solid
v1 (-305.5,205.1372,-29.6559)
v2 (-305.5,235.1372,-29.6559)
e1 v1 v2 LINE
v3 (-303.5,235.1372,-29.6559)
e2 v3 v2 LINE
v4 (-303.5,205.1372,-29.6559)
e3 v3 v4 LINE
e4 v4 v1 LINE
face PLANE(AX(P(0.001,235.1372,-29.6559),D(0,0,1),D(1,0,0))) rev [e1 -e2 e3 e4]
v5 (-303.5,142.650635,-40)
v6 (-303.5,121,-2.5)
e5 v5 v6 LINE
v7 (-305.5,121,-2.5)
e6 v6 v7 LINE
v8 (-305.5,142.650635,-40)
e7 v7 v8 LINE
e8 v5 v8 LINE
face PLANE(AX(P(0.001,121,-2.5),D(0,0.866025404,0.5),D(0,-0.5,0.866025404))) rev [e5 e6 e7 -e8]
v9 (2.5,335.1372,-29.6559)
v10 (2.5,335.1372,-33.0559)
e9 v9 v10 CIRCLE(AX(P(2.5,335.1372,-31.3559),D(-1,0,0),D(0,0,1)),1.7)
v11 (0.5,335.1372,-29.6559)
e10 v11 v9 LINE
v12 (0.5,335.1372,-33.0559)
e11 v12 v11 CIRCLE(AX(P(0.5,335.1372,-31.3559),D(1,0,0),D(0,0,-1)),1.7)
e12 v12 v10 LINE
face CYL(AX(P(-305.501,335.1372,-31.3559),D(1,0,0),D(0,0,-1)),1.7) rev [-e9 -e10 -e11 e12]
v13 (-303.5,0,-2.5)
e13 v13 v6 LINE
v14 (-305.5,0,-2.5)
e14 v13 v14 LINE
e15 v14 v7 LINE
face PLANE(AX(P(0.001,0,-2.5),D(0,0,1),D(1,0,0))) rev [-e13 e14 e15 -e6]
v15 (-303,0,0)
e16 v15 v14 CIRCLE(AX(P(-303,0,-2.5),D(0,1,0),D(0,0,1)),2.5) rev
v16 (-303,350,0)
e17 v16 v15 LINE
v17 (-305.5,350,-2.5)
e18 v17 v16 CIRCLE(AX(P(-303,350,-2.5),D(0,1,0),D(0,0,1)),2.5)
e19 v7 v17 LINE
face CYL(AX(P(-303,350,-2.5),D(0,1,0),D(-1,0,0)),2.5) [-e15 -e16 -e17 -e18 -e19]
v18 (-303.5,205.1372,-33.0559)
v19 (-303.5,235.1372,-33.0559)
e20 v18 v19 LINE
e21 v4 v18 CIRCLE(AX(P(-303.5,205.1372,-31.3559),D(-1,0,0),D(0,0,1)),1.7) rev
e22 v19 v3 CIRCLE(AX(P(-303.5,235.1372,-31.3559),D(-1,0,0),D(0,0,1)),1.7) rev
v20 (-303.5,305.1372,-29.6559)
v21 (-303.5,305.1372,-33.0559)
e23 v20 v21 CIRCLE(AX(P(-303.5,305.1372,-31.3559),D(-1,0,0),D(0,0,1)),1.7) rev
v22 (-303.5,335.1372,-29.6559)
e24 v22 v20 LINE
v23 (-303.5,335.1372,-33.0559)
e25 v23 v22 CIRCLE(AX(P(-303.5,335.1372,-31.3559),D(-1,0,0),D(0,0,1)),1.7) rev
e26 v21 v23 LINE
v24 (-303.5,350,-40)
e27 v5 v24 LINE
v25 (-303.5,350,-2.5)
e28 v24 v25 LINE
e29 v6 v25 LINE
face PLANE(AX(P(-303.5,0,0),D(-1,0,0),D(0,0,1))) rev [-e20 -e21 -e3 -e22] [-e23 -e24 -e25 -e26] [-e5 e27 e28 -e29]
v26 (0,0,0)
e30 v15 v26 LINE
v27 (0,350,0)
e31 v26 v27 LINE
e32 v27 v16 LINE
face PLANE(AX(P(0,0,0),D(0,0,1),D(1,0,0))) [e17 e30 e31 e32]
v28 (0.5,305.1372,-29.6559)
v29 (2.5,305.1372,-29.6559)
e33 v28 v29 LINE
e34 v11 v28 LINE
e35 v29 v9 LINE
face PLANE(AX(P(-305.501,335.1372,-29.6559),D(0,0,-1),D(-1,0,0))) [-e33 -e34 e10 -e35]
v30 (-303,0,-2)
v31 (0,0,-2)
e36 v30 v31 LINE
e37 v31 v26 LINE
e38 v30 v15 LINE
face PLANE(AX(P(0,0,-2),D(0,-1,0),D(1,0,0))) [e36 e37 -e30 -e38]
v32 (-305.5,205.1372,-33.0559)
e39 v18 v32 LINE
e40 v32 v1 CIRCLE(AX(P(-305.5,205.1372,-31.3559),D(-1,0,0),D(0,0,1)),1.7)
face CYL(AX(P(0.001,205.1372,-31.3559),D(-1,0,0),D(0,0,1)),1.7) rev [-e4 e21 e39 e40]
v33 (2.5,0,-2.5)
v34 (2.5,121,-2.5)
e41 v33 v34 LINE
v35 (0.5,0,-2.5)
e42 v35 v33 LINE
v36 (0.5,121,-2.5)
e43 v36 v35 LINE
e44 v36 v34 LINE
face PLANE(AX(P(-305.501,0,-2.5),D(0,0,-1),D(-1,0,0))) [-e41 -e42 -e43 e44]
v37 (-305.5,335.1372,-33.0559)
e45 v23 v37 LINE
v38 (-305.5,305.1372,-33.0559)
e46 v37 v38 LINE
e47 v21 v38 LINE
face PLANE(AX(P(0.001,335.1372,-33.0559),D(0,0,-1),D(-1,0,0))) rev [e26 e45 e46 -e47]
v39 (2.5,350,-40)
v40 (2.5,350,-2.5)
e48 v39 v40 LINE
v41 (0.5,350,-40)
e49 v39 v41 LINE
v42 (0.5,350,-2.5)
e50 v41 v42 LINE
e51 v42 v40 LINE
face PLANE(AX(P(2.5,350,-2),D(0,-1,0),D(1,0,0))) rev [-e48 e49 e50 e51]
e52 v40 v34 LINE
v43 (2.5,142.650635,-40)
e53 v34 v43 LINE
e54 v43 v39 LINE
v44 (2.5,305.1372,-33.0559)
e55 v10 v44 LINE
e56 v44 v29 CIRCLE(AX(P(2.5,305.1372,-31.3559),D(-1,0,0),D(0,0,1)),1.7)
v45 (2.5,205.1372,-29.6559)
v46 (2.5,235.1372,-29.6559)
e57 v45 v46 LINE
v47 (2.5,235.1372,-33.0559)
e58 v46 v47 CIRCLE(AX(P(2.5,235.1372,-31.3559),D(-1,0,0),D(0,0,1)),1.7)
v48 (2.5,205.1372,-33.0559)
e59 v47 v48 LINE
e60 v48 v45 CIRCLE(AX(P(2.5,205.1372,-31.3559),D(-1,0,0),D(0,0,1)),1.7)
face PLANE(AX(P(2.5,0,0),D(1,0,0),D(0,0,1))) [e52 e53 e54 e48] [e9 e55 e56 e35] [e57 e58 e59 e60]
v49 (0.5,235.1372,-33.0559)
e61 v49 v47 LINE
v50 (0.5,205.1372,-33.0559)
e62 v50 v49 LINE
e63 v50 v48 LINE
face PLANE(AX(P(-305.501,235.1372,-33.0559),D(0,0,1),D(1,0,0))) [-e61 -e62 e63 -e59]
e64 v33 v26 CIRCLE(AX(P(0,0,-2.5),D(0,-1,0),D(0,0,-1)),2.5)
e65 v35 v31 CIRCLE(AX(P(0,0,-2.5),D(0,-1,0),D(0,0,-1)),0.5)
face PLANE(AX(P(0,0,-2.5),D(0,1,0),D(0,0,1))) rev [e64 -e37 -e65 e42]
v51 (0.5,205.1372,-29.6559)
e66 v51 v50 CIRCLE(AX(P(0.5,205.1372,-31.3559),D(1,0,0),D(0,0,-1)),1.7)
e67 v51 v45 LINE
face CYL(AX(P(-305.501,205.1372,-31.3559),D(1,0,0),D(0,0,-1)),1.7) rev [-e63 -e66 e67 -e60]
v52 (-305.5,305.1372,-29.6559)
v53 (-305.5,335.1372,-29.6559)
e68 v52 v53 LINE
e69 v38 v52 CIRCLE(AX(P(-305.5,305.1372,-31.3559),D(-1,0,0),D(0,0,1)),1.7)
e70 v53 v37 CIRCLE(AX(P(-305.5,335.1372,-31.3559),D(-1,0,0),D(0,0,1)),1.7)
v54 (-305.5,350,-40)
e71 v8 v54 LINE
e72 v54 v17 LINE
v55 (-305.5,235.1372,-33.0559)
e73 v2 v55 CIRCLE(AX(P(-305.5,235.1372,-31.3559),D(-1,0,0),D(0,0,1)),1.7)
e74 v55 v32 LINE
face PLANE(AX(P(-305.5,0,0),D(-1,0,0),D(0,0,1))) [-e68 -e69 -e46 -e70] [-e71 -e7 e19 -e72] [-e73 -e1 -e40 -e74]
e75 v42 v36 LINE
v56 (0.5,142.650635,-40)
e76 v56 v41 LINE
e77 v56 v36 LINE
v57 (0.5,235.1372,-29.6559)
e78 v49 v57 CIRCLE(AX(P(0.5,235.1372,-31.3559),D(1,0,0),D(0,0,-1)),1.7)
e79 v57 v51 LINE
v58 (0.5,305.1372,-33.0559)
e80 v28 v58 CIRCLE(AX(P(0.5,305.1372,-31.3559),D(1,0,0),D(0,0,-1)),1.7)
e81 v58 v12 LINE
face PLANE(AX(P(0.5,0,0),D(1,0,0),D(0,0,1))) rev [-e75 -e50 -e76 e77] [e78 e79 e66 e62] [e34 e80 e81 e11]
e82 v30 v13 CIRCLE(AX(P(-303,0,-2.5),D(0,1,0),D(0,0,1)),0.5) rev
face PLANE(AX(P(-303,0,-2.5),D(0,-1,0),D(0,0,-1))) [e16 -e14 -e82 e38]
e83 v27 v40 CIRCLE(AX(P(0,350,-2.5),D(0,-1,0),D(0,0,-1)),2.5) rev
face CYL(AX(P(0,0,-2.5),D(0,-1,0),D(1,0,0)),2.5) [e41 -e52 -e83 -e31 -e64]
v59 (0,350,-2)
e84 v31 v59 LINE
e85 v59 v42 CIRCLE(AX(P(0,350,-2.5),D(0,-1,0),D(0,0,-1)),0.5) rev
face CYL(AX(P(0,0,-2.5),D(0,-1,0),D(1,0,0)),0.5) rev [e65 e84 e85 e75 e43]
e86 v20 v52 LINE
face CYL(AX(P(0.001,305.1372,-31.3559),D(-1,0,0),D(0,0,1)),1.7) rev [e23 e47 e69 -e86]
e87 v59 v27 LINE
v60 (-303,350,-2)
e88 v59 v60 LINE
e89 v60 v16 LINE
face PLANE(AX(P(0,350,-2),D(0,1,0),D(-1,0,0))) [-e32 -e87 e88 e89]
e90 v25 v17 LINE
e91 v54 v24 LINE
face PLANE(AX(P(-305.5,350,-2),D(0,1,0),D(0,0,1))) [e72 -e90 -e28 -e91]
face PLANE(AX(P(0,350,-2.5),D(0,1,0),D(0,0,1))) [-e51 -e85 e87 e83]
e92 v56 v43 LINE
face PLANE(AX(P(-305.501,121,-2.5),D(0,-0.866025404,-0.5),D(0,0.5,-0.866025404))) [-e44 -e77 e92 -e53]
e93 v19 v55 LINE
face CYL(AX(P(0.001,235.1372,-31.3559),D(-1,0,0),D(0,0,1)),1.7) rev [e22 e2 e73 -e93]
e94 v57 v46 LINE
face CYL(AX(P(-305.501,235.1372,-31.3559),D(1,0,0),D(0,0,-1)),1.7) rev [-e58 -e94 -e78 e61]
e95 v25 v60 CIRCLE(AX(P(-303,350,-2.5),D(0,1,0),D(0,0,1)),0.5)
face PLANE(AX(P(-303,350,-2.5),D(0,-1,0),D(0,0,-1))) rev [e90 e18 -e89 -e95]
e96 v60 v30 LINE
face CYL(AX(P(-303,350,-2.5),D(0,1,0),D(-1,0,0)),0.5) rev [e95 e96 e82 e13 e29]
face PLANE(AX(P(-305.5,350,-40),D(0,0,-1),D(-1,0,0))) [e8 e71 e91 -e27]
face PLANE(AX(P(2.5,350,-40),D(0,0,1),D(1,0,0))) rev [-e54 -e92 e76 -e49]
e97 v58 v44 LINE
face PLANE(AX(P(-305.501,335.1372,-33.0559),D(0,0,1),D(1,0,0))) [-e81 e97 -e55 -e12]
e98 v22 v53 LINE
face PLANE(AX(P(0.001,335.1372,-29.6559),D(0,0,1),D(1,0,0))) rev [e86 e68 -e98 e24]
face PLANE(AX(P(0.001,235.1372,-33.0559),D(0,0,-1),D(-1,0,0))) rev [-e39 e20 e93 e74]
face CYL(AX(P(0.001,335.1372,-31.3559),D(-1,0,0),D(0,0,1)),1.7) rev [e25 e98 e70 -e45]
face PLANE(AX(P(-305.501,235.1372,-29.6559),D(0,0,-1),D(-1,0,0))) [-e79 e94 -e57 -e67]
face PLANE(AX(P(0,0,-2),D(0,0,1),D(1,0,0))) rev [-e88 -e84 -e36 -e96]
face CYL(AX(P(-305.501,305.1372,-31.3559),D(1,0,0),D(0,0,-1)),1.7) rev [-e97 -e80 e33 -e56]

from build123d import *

# Parameters (mm, degrees)
SKETCH1_W            = 303
SKETCH1_H            = 350
BASE_FLANGE1_DEPTH   = 2
EDGE_FLANGE1_DEPTH   = 350
CUT_EXTRUDE1_REACH   = 468.294
CUT_EXTRUDE2_REACH   = 468.294
LPATTERN1_COUNT      = 2
LPATTERN1_PITCH      = 100
MIRROR1_COPY_1_REACH = 468.294


# Sheet-metal steps are written as plain solids
with BuildPart() as part:
    # Sketch1 → Base-Flange1 (new body)
    with BuildSketch(Plane.XY):
        with Locations((-151.5, 175)):
            Rectangle(SKETCH1_W, SKETCH1_H)
    extrude(amount=-BASE_FLANGE1_DEPTH)

    # Edge-Flange1 section (across the edge) → Edge-Flange1 (add)
    with BuildSketch(Plane(origin=(-303.5, 0, -2), x_dir=(1, 0, 0), z_dir=(0, 1, 0))):
        with BuildLine():
            Line((-2, 0.5), (-2, 38))
            Line((-2, 38), (0, 38))
            Line((0, 38), (0, 0.5))
            ThreePointArc((0, 0.5), (0.146446609, 0.146446609), (0.5, 0))
            Line((0.5, 0), (0.5, -2))
            ThreePointArc((0.5, -2), (-1.267766953, -1.267766953), (-2, 0.5))
        make_face()
    edge_flange1 = extrude(amount=EDGE_FLANGE1_DEPTH)

    # Sketch15 → Cut-Extrude1 (cut, up to next)
    with BuildSketch(Plane.ZY.offset(305.5), mode=Mode.PRIVATE) as cut_extrude1_sk1:
        Polygon((-2.5, 0), (-2.5, 121), (-40, 142.650635095), (-40, 0), align=None)
    cut_extrude1_tool1 = extrude(cut_extrude1_sk1.sketch, amount=-CUT_EXTRUDE1_REACH, mode=Mode.PRIVATE) & part.part
    cut_extrude1 = cut_extrude1_tool1.solids().sort_by_distance((-305.5, 66.060819, -21.763242))[0]
    add(cut_extrude1, mode=Mode.SUBTRACT)

    # Sketch18 → Cut-Extrude2 (cut, up to next)
    with BuildSketch(Plane.ZY.offset(305.5), mode=Mode.PRIVATE) as cut_extrude2_sk1:
        with BuildLine():
            Line((-29.6559, 235.1372), (-29.6559, 205.1372))
            ThreePointArc((-29.6559, 205.1372), (-31.3559, 203.4372), (-33.0559, 205.1372))
            Line((-33.0559, 205.1372), (-33.0559, 235.1372))
            ThreePointArc((-33.0559, 235.1372), (-31.3559, 236.8372), (-29.6559, 235.1372))
        make_face()
    cut_extrude2_tool1 = extrude(cut_extrude2_sk1.sketch, amount=-CUT_EXTRUDE2_REACH, mode=Mode.PRIVATE) & part.part
    cut_extrude2 = cut_extrude2_tool1.solids().sort_by_distance((-305.5, 220.1372, -31.3559))[0]
    add(cut_extrude2, mode=Mode.SUBTRACT)

    # LPattern1: Cut-Extrude2 ×2
    with Locations(*[(0, i * LPATTERN1_PITCH, 0) for i in range(1, LPATTERN1_COUNT)]):
        add(cut_extrude2, mode=Mode.SUBTRACT)

    # Mirror1: Edge-Flange1, Cut-Extrude1, Cut-Extrude2 across plane
    add(edge_flange1.mirror(Plane.ZY.offset(151.5)))
    add(cut_extrude1.mirror(Plane.ZY.offset(151.5)), mode=Mode.SUBTRACT)
    add(cut_extrude2.mirror(Plane.ZY.offset(151.5)), mode=Mode.SUBTRACT)

    # Mirror1 copy 1 sketch → Mirror1 copy 1 (cut, up to next)
    with BuildSketch(Plane(origin=(2.5, 100, 0), x_dir=(0, 0, 1), z_dir=(1, 0, 0)), mode=Mode.PRIVATE) as mirror1_copy_1_sk1:
        with BuildLine():
            Line((-29.6559, -235.1372), (-29.6559, -205.1372))
            ThreePointArc((-29.6559, -205.1372), (-31.3559, -203.4372), (-33.0559, -205.1372))
            Line((-33.0559, -205.1372), (-33.0559, -235.1372))
            ThreePointArc((-33.0559, -235.1372), (-31.3559, -236.8372), (-29.6559, -235.1372))
        make_face()
    mirror1_copy_1_tool1 = extrude(mirror1_copy_1_sk1.sketch, amount=-MIRROR1_COPY_1_REACH, mode=Mode.PRIVATE) & part.part
    add(mirror1_copy_1_tool1.solids().sort_by_distance((2.5, 320.1372, -31.3559))[0], mode=Mode.SUBTRACT)


solid = part.part
